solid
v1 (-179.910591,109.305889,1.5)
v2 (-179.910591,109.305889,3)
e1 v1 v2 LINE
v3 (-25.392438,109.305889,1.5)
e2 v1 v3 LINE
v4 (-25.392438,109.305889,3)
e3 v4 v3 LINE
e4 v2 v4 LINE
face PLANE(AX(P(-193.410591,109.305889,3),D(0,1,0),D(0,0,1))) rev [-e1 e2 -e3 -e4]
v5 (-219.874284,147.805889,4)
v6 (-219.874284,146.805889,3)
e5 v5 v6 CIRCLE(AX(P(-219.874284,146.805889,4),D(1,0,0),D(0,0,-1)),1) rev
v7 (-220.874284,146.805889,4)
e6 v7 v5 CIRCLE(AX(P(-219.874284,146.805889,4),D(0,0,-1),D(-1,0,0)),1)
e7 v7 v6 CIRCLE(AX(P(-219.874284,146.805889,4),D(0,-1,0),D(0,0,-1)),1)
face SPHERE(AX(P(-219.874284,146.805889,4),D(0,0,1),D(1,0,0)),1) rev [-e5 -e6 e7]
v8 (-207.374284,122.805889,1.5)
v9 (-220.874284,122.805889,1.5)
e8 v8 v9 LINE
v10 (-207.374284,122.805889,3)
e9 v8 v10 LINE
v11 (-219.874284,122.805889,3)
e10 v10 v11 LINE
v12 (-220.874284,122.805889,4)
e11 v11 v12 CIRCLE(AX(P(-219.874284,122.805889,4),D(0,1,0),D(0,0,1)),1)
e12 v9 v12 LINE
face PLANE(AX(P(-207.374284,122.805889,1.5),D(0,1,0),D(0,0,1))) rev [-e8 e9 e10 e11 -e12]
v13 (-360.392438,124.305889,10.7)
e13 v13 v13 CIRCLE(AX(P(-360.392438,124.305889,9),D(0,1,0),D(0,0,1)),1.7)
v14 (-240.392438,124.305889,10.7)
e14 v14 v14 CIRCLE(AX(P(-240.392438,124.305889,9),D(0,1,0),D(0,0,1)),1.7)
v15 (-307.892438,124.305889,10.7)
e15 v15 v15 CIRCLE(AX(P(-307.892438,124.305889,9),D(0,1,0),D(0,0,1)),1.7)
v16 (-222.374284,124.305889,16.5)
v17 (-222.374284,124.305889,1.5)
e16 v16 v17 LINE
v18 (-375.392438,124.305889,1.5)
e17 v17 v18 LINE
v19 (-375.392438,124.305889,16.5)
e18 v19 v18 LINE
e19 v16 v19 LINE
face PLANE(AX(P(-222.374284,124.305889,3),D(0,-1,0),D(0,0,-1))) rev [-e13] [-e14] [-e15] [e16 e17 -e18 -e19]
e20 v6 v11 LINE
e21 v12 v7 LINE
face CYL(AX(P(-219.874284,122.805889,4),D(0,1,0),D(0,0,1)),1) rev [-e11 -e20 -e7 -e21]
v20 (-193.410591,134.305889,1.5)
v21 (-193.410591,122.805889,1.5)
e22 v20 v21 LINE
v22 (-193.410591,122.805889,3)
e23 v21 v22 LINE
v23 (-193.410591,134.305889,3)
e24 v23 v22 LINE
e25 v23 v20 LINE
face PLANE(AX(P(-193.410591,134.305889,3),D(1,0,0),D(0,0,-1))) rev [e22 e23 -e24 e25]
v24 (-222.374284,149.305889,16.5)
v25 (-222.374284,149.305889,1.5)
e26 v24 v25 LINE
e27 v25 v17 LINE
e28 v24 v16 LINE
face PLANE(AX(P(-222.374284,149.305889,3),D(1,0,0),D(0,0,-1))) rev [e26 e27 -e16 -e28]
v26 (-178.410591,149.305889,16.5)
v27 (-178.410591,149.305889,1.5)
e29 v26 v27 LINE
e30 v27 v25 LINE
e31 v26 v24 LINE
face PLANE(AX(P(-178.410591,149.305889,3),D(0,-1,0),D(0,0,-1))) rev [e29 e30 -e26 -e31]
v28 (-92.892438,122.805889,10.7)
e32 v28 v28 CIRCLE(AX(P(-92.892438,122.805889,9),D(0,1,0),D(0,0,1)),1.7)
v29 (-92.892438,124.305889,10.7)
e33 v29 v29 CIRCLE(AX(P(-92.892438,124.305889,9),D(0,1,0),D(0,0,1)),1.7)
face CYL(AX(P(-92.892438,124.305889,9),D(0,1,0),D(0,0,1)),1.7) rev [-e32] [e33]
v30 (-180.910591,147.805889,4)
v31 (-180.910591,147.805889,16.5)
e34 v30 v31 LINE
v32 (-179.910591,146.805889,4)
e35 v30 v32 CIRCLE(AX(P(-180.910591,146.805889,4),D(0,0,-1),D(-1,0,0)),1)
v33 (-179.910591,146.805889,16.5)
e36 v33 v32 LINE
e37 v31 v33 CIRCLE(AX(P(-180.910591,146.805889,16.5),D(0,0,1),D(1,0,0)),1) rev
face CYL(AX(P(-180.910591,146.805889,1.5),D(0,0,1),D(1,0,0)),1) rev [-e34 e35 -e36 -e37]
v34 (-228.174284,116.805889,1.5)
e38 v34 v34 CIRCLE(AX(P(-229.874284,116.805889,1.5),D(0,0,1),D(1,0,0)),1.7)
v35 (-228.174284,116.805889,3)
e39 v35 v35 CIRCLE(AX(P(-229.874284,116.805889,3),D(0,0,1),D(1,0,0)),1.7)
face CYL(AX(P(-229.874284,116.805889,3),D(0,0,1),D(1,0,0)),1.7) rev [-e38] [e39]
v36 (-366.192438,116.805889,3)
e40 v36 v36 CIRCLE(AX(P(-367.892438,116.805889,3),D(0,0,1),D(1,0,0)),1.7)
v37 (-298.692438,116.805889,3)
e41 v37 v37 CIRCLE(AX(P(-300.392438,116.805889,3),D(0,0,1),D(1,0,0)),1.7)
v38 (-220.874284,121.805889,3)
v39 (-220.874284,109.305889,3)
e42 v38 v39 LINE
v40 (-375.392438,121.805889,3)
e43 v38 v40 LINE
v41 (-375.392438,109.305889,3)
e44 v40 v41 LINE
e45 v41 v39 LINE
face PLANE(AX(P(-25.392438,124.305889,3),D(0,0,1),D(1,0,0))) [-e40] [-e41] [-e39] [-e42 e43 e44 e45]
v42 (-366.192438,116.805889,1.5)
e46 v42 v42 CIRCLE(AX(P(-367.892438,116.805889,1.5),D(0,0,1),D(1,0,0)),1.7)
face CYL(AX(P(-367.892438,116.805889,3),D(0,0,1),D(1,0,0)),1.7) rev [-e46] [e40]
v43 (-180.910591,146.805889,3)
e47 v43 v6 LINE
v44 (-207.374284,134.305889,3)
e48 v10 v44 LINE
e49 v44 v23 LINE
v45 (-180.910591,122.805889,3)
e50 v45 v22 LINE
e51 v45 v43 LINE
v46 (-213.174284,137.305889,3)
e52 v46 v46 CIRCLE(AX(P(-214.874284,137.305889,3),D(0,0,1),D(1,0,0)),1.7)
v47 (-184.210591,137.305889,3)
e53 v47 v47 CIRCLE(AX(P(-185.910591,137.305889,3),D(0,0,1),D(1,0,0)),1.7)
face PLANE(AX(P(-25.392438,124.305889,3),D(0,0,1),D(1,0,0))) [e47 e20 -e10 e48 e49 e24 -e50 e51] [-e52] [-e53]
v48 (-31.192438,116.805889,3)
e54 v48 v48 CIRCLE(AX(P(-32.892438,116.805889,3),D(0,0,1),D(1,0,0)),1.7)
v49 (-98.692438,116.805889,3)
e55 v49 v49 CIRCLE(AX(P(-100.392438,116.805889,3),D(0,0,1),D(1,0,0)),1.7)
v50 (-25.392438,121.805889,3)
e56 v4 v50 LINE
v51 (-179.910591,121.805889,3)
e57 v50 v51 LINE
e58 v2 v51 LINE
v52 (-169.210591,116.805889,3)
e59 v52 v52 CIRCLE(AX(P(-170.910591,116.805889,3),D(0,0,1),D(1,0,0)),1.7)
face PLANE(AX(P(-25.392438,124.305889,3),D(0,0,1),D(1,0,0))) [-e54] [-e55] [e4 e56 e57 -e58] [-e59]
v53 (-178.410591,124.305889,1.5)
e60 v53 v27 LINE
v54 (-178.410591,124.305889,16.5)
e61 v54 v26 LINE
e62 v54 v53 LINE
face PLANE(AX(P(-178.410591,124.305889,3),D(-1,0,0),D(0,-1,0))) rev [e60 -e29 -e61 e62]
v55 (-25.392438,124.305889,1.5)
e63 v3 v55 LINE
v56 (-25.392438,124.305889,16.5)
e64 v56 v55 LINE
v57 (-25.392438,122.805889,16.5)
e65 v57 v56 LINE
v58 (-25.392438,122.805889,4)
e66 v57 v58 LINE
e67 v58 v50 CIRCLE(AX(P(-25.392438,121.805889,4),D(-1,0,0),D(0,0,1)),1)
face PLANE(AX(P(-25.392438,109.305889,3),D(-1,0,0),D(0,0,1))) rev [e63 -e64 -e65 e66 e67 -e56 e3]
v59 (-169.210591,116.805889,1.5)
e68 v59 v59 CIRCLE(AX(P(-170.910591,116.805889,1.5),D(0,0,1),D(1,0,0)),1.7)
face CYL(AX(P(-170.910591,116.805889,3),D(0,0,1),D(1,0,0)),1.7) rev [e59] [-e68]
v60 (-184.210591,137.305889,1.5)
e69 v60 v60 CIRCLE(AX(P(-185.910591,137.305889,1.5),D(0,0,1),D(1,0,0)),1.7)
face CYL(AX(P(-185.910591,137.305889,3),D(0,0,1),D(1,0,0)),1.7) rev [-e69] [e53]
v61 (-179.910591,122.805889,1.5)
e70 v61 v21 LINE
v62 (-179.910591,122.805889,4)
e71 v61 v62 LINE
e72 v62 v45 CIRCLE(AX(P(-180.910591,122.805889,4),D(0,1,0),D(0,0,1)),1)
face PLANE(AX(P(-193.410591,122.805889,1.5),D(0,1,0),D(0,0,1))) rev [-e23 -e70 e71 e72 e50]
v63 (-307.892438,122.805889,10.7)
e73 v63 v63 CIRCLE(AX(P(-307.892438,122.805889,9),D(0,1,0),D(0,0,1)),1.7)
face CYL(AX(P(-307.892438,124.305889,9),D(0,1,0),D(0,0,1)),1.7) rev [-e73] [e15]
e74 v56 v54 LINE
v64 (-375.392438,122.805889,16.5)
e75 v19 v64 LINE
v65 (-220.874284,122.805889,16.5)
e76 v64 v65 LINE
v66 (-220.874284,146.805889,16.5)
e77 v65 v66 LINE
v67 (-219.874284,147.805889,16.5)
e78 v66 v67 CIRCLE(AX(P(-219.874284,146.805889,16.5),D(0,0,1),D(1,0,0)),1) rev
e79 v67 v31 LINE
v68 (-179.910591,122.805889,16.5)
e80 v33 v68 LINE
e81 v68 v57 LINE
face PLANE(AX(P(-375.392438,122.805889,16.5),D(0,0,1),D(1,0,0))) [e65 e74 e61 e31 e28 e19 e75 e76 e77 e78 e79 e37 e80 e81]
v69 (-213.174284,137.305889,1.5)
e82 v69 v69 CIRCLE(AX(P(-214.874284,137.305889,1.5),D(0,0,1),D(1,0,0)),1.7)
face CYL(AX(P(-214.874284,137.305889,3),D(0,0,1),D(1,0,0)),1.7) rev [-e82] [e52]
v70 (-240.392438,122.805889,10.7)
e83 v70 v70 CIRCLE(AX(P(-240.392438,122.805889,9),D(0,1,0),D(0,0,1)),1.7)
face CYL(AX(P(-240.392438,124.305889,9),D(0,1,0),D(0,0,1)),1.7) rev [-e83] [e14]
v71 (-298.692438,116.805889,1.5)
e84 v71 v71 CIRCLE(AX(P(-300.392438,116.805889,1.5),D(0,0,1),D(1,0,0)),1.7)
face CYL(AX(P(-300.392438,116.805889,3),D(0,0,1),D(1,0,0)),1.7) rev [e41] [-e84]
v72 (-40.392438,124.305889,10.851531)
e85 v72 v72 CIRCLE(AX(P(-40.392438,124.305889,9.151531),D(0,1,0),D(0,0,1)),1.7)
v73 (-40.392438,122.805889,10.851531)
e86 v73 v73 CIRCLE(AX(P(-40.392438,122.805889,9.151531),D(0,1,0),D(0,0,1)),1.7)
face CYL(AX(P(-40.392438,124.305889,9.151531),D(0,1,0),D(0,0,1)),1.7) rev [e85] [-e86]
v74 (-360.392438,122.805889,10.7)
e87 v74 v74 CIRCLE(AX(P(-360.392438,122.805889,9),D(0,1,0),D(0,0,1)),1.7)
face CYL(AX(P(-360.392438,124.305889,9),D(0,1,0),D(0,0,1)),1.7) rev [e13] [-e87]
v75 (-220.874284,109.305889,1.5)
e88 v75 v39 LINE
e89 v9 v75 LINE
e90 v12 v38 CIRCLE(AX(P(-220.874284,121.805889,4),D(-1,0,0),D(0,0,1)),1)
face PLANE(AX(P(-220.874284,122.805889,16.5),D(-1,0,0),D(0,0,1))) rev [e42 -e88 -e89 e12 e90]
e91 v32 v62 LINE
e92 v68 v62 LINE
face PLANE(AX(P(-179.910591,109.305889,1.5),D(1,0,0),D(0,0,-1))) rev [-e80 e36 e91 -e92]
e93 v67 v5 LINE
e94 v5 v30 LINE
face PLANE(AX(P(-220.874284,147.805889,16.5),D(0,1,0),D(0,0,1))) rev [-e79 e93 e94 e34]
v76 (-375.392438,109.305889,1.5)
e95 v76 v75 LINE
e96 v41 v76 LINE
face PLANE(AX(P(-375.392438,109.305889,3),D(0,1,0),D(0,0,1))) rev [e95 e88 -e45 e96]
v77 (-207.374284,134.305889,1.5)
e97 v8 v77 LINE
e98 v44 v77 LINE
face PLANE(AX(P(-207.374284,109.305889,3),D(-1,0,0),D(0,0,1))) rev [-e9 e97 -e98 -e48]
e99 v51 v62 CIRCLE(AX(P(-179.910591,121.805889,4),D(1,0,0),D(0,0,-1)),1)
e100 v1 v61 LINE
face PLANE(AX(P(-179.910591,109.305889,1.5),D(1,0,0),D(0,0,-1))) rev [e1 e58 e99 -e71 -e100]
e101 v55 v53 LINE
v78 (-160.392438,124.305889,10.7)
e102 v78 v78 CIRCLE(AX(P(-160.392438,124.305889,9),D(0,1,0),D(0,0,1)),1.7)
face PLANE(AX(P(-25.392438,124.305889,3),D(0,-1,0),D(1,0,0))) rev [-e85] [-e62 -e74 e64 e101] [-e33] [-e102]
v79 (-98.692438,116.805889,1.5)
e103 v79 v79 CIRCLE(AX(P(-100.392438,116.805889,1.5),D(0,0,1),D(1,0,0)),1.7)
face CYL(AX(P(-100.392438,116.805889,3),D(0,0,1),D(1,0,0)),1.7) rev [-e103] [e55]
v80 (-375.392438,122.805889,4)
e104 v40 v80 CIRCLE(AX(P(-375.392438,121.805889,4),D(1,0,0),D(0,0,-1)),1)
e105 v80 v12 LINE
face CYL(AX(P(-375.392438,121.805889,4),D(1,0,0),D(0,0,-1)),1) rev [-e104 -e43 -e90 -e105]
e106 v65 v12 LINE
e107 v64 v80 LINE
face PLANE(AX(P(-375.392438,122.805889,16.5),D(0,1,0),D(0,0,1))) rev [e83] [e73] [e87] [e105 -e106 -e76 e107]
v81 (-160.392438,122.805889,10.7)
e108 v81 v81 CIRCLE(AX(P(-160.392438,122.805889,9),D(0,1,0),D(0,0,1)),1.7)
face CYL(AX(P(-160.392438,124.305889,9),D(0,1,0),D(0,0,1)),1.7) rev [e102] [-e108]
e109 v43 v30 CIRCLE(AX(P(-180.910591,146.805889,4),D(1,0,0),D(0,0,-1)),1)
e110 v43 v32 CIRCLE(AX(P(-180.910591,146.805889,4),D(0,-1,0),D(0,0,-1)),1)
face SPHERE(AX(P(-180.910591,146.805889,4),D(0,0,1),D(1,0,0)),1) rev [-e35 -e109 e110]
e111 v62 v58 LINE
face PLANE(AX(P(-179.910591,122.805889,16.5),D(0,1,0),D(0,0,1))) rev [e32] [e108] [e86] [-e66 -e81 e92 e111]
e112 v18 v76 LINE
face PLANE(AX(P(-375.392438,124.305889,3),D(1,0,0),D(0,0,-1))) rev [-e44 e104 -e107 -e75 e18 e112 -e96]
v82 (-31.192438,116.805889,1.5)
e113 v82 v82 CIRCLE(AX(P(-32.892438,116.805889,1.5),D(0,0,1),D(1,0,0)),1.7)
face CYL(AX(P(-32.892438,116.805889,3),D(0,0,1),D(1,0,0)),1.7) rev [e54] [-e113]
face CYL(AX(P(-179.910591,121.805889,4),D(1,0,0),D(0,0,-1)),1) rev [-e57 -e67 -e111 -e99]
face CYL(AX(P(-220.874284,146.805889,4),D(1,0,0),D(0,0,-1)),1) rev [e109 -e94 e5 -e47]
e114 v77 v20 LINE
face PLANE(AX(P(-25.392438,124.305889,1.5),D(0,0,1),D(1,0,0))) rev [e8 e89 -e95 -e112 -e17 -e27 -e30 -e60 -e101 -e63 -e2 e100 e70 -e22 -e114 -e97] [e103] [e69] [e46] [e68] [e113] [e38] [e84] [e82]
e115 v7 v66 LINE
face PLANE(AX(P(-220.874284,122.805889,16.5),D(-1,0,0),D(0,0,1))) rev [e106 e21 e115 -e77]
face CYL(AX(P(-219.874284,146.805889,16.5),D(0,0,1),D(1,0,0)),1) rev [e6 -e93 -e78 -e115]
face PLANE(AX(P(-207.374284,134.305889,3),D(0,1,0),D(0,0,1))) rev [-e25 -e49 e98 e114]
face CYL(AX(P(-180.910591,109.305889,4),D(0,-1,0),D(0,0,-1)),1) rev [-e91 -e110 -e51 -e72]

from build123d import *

# Parameters (mm, degrees)
BOSS_EXTRU_1_DEPTH      = 1.5
BOSS_EXTRU_2_DEPTH      = 13.5
D_GAGEMENT_M32_D        = 3.4
D_GAGEMENT_M32_DEPTH    = 10
D_GAGEMENT_M32_TIP      = 1.021463052
D_GAGEMENT_M31_D        = 3.4
D_GAGEMENT_M31_DEPTH    = 10
D_GAGEMENT_M31_TIP      = 1.021463052
ESQUISSE12_W            = 13.5
ESQUISSE12_H            = 13.5
ENL_V_MAT_EXTRU_1_DEPTH = 1.5
CONG_1_R                = 1
CONG_2_R                = 1
D_GAGEMENT_M33_D        = 3.4
D_GAGEMENT_M33_DEPTH    = 10
D_GAGEMENT_M33_TIP      = 1.021463052


# Some blends are built 0.0001 mm under size
with BuildPart() as part:
    # Esquisse2 → Boss.-Extru.1 (new body)
    with BuildSketch(Plane.XY.offset(1.5)):
        Polygon((-25.392437762, 124.305889048), (-178.410591433, 124.305889048), (-178.410591433, 149.305889048), (-222.374284091, 149.305889048), (-222.374284091, 124.305889048), (-375.392437762, 124.305889048), (-375.392437762, 109.305889048), (-207.374284091, 109.305889048), (-207.374284091, 134.305889048), (-193.410591433, 134.305889048), (-193.410591433, 109.305889048), (-25.392437762, 109.305889048), align=None)
    extrude(amount=BOSS_EXTRU_1_DEPTH)

    # Esquisse3 → Boss.-Extru.2 (add)
    with BuildSketch(Plane.XY.offset(3)):
        Polygon((-375.392437762, 122.805889048), (-220.874284091, 122.805889048), (-220.874284091, 147.805889048), (-179.910591433, 147.805889048), (-179.910591433, 122.805889048), (-25.392437762, 122.805889048), (-25.392437762, 124.305889048), (-178.410591433, 124.305889048), (-178.410591433, 149.305889048), (-222.374284091, 149.305889048), (-222.374284091, 124.305889048), (-375.392437762, 124.305889048), align=None)
    extrude(amount=BOSS_EXTRU_2_DEPTH)

    # Dégagement M32
    with Locations(Plane(origin=(-229.874284091, 116.805889048, 3), x_dir=(1, 0, 0), z_dir=(0, 0, 1))):
        with Locations((0, 0), (-70.518153671, 0), (-138.018153671, 0), (58.963692658, 0), (129.481846329, 0), (196.981846329, 0)):
            Hole(D_GAGEMENT_M32_D / 2, depth=D_GAGEMENT_M32_DEPTH)
            with Locations((0, 0, -(D_GAGEMENT_M32_DEPTH + D_GAGEMENT_M32_TIP / 2))):  # 118° drill point
                Cone(0, D_GAGEMENT_M32_D / 2, D_GAGEMENT_M32_TIP, mode=Mode.SUBTRACT)

    # Dégagement M31
    with Locations(Plane(origin=(-214.874284091, 137.305889048, 3), x_dir=(1, 0, 0), z_dir=(0, 0, 1))):
        with Locations((0, 0), (28.963692658, 0)):
            Hole(D_GAGEMENT_M31_D / 2, depth=D_GAGEMENT_M31_DEPTH)
            with Locations((0, 0, -(D_GAGEMENT_M31_DEPTH + D_GAGEMENT_M31_TIP / 2))):  # 118° drill point
                Cone(0, D_GAGEMENT_M31_D / 2, D_GAGEMENT_M31_TIP, mode=Mode.SUBTRACT)

    # Esquisse12 → Enlèv. mat.-Extru.1 (cut)
    with BuildSketch(Plane.XY.offset(3)):
        with Locations((-214.124284091, 116.055889048)):
            Rectangle(ESQUISSE12_W, ESQUISSE12_H)
        with Locations((-186.660591433, 116.055889048)):
            Rectangle(ESQUISSE12_W, ESQUISSE12_H)
    extrude(amount=-ENL_V_MAT_EXTRU_1_DEPTH, mode=Mode.SUBTRACT)

    # Congé1
    # the kernel refuses this fillet: 1 mm, written as the material it adds along each edge
    with BuildSketch(Plane(origin=(-179.910591433, 122.805889048, 3), x_dir=(0, -1, 0), z_dir=(1, 0, 0))) as cong_1_piece_1:
        with BuildLine():
            CenterArc((CONG_1_R, -CONG_1_R), CONG_1_R, 90, 90)
            Line((0, -CONG_1_R), (0, 0))
            Line((0, 0), (CONG_1_R, 0))
        make_face()
    extrude(amount=154.518153671)
    with BuildSketch(Plane(origin=(-223.374284091, 147.805889048, 3), x_dir=(0, 0, 1), z_dir=(1, 0, 0))) as cong_1_piece_2_section:
        with BuildLine():
            CenterArc((CONG_1_R, CONG_1_R), CONG_1_R, 180, 90)
            Line((0, CONG_1_R), (0, 0))
            Line((0, 0), (CONG_1_R, 0))
        make_face()
    cong_1_piece_2 = extrude(amount=43.463692658, mode=Mode.PRIVATE)
    cong_1_piece_2 = split(cong_1_piece_2, bisect_by=Plane(origin=(-222.374284091, 147.582521109, 3.223367939), z_dir=(1, 0, 0)), keep=Keep.TOP, mode=Mode.PRIVATE)
    add(cong_1_piece_2)
    with BuildSketch(Plane(origin=(-375.392437762, 122.805889048, 3), x_dir=(0, 0, 1), z_dir=(1, 0, 0))) as cong_1_piece_3:
        with BuildLine():
            CenterArc((CONG_1_R, CONG_1_R), CONG_1_R, 180, 90)
            Line((0, CONG_1_R), (0, 0))
            Line((0, 0), (CONG_1_R, 0))
        make_face()
    extrude(amount=154.518153671)

    # Congé2
    cong_2_edges = [part.edges().sort_by_distance(p)[0] for p in [
        (-179.910591433, 134.805889048, 3),
        (-179.910591433, 147.512995829, 3.292893219),
        (-220.874284091, 147.512995829, 3.292893219),
        (-220.874284091, 134.805889048, 3),
        (-220.874284091, 147.805889048, 10.25),
        (-179.910591433, 147.805889048, 10.25),
    ]]
    fillet(cong_2_edges, radius=CONG_2_R - 0.0001)  # a hair under: the kernel refuses the full size

    # Dégagement M33
    with Locations(Plane(origin=(-92.892437762, 124.305889048, 9), x_dir=(1, 0, 0), z_dir=(0, 1, 0))):
        with Locations((0, 0), (52.5, -0.151530772), (-67.5, 0), (-147.5, 0), (-215, 0), (-267.5, 0)):
            Hole(D_GAGEMENT_M33_D / 2, depth=D_GAGEMENT_M33_DEPTH)
            with Locations((0, 0, -(D_GAGEMENT_M33_DEPTH + D_GAGEMENT_M33_TIP / 2))):  # 118° drill point
                Cone(0, D_GAGEMENT_M33_D / 2, D_GAGEMENT_M33_TIP, mode=Mode.SUBTRACT)


solid = part.part
